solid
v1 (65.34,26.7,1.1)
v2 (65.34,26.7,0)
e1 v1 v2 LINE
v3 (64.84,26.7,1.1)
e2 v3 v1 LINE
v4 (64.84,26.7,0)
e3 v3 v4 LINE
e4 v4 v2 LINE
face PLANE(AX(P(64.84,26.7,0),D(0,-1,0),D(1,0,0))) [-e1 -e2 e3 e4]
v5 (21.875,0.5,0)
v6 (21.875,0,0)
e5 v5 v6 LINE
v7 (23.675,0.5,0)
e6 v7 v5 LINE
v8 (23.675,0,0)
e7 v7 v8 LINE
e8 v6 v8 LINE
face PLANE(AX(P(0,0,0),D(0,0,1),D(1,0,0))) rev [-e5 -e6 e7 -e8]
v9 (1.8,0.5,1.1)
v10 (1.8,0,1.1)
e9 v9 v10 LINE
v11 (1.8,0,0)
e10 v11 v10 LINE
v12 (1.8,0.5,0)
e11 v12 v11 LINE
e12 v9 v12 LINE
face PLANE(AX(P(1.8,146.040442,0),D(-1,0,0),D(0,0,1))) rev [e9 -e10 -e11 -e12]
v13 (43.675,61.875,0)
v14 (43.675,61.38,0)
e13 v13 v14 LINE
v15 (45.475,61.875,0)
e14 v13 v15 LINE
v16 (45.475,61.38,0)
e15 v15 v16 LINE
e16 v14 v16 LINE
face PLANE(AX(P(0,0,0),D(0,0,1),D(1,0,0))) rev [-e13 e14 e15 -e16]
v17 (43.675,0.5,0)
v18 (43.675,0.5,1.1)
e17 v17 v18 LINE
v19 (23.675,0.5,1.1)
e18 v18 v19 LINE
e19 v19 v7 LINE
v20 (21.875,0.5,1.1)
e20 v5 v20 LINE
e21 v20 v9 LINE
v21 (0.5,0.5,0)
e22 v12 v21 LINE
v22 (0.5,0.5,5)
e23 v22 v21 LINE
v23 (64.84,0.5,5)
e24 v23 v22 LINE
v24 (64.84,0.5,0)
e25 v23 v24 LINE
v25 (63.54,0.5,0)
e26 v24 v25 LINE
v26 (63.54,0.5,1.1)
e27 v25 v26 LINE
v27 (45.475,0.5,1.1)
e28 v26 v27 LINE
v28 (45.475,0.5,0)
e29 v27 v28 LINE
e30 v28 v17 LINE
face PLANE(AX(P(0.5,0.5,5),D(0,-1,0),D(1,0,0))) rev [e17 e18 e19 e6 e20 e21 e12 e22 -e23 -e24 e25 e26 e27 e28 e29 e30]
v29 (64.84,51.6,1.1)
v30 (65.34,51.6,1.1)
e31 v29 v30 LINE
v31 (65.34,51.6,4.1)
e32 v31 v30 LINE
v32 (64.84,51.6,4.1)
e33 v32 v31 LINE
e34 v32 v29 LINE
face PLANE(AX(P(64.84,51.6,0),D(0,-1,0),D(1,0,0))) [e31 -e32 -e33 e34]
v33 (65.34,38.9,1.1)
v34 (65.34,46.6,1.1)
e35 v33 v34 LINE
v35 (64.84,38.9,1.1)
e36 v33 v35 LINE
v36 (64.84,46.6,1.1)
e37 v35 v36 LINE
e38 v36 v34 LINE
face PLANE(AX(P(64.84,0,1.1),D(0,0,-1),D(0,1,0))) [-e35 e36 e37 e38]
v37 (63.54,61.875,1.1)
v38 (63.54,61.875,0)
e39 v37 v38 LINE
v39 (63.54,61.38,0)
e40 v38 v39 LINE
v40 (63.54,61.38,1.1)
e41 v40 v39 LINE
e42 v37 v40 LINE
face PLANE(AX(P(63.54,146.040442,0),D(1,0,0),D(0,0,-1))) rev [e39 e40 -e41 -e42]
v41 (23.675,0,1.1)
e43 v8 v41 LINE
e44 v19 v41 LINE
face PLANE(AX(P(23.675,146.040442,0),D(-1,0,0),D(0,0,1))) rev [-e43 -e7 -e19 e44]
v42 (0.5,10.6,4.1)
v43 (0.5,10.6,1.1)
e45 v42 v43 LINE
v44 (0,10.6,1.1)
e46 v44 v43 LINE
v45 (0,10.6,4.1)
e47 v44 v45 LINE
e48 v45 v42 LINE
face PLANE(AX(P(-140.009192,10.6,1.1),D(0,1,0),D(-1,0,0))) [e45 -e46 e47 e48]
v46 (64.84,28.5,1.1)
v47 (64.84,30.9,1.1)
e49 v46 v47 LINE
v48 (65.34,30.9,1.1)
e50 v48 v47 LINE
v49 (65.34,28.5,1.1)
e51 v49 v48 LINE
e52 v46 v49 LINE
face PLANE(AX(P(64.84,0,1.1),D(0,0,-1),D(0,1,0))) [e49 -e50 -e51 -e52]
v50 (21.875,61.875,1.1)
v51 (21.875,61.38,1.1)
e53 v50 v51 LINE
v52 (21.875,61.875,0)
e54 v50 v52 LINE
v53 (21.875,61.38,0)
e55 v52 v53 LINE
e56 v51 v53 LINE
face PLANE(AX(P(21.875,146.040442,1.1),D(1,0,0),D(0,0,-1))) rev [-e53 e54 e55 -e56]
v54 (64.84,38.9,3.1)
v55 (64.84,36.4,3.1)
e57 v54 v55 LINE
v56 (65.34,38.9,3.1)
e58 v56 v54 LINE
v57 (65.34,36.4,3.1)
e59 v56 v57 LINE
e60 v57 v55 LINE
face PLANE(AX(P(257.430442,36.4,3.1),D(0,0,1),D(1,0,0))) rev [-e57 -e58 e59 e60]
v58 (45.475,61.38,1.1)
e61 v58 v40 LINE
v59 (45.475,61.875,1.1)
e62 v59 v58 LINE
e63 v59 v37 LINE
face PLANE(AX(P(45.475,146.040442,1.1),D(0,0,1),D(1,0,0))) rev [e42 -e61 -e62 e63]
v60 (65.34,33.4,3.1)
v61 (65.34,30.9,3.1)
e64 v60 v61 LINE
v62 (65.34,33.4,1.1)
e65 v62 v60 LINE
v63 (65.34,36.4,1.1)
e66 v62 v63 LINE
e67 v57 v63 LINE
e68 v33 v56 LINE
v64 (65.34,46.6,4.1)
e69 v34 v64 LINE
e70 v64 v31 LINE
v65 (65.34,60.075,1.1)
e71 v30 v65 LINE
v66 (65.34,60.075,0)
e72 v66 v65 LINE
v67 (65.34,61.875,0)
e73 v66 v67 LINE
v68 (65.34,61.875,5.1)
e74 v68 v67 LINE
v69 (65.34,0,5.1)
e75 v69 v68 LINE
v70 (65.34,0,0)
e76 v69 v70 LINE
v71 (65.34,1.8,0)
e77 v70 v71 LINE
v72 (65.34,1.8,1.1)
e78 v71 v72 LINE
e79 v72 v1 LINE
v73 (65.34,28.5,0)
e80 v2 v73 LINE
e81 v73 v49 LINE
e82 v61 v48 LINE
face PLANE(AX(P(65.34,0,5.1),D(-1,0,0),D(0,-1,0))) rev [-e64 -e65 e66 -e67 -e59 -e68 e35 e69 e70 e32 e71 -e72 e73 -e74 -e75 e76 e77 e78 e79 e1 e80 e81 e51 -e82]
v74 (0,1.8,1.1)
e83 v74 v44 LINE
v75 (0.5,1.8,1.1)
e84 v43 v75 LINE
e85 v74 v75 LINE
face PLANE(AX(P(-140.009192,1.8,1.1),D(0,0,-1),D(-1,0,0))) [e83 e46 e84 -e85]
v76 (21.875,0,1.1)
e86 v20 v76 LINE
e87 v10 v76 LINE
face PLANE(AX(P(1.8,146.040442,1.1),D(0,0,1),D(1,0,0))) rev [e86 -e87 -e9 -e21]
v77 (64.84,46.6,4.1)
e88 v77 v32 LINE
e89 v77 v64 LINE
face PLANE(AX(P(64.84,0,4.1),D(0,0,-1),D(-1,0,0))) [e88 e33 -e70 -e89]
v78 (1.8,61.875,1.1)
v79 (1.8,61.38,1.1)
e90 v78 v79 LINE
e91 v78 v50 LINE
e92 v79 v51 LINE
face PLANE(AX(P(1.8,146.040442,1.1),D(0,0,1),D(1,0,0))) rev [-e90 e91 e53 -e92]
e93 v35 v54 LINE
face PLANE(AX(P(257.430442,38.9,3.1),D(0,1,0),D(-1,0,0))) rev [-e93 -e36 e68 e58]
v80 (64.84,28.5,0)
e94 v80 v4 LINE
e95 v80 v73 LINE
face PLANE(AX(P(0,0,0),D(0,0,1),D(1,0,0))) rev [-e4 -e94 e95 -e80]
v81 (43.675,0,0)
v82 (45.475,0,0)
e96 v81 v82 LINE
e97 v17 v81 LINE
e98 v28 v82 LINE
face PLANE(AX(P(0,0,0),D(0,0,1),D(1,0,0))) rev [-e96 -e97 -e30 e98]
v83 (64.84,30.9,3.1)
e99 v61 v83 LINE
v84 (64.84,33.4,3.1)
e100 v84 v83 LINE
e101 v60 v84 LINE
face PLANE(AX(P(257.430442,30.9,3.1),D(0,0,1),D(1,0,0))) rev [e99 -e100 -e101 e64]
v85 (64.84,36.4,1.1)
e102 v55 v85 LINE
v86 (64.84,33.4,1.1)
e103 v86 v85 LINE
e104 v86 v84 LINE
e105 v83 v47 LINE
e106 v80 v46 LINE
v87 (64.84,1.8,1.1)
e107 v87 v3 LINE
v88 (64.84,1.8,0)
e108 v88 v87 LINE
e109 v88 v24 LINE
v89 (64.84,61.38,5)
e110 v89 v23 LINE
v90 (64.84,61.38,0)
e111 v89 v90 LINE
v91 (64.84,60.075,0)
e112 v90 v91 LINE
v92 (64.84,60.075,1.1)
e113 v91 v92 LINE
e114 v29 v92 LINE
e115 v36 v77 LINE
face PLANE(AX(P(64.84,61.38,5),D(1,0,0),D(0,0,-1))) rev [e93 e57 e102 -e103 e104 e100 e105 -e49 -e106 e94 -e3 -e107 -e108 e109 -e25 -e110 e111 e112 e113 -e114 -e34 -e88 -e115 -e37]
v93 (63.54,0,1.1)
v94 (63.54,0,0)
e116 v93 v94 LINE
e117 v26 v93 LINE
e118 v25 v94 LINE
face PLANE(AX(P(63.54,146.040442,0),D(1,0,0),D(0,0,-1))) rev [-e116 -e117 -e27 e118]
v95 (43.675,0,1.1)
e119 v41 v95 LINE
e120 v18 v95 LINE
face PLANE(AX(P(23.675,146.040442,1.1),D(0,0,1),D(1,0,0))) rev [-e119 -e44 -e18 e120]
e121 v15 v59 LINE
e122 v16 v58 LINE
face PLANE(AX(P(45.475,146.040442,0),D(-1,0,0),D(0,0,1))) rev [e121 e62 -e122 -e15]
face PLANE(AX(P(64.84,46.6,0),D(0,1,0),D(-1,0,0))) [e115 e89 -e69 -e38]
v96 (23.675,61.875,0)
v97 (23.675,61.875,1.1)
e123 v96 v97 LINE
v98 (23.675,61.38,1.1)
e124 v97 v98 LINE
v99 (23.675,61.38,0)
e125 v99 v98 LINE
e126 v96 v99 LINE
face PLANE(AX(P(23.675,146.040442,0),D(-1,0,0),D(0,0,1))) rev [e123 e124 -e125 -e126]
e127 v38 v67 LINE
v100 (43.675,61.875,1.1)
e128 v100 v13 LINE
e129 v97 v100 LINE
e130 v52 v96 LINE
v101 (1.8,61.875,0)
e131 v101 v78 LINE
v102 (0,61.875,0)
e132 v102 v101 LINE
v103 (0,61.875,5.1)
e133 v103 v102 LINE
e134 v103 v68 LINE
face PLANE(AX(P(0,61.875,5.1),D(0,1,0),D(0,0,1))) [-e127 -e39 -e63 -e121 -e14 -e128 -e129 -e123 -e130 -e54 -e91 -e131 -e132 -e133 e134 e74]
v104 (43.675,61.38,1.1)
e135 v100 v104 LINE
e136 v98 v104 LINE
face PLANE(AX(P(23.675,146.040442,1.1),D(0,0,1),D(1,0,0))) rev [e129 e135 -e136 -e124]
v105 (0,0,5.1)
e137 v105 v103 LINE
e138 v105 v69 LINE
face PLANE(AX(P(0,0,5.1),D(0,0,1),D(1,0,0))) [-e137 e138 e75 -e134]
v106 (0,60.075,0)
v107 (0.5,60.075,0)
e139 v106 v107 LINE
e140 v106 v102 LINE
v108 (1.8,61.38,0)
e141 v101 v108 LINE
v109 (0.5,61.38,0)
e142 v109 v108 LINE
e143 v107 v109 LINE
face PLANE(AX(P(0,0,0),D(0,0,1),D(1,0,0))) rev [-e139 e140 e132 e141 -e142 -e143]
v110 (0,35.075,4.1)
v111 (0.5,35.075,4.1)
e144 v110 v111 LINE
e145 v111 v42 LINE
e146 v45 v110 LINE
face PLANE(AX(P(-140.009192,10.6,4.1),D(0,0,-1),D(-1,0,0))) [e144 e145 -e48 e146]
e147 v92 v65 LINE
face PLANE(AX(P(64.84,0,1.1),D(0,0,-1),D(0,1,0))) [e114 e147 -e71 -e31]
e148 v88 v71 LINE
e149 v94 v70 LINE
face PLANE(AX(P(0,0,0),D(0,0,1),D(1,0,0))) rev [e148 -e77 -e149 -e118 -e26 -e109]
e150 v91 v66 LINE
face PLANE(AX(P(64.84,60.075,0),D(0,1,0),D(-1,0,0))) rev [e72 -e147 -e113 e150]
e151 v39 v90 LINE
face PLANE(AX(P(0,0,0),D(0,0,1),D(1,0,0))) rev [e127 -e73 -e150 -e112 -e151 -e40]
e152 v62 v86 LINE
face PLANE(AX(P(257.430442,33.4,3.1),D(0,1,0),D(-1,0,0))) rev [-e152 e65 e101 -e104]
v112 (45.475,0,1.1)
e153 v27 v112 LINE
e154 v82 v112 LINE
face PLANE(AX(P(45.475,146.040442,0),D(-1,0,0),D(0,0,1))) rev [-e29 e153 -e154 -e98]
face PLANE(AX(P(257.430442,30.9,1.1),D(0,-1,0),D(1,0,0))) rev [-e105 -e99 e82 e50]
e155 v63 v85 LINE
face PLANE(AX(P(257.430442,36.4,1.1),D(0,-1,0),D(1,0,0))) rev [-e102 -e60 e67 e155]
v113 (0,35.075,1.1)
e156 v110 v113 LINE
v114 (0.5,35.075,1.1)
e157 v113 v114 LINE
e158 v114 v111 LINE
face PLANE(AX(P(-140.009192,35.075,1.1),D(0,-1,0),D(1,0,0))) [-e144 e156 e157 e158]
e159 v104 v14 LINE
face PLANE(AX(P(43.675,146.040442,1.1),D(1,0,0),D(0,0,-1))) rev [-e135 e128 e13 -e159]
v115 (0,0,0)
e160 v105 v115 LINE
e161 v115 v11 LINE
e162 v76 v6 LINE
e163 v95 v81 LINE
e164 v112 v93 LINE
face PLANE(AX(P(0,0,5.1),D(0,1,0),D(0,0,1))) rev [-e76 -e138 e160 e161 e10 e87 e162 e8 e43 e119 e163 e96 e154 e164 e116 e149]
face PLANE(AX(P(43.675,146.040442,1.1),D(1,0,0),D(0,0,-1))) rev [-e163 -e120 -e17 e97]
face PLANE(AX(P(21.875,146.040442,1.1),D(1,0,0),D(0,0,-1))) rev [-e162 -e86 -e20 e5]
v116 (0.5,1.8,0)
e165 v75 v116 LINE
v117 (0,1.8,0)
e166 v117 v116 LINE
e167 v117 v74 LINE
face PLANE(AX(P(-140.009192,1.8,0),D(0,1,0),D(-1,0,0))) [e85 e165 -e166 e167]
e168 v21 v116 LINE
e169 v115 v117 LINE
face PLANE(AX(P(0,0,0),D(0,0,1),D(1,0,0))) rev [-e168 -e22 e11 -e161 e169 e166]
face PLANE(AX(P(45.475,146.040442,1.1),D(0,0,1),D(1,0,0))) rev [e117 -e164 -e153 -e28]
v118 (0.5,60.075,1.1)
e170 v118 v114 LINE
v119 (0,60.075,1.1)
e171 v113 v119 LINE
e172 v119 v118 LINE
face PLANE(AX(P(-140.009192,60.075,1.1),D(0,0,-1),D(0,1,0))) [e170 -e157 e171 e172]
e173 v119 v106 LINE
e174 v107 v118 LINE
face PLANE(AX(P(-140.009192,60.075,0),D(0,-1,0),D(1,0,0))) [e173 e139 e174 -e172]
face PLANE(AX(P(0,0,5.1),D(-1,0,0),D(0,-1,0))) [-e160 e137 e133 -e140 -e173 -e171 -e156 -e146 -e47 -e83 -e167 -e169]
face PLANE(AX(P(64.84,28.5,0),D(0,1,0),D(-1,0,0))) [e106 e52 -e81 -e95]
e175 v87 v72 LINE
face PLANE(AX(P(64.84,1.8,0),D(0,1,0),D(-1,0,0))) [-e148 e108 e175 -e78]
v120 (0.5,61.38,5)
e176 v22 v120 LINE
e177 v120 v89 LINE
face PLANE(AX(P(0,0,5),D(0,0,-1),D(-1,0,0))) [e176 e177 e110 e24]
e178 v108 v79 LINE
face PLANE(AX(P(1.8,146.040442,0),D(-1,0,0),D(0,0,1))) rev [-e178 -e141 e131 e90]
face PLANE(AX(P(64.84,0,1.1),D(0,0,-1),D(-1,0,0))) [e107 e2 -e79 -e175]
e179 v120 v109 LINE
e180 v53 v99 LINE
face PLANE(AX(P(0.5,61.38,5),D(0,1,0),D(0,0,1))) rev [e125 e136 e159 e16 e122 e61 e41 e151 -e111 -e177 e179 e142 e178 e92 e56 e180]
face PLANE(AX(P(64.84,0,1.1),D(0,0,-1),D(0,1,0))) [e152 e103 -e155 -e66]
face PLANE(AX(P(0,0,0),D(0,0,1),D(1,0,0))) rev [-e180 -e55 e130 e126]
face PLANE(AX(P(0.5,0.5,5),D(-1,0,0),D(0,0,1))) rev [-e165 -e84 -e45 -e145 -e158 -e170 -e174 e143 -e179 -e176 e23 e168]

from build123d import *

# Parameters (mm, degrees)
SKETCH_1_W               = 65.34
SKETCH_1_H               = 61.875
EXTRUDE_1_DEPTH          = 5.1
CUT_EXTRUDE_1_DEPTH      = 0.5
SKETCH_2_3_W             = 1.1
SKETCH_2_3_H             = 24.9
CUT_EXTRUDE_2_DEPTH      = 0.5
SKETCH_3_OUTSIDE_W       = 85.366
SKETCH_3_OUTSIDE_H       = 81.901
SKETCH_3_OUTSIDE_W_2     = 65.34
SKETCH_3_OUTSIDE_H_2     = 61.875
SKETCH_3_OUTSIDE_W_3     = 64.34
SKETCH_3_OUTSIDE_H_3     = 60.88
CUT_EXTRUDE_4_DEPTH      = 5
CUT_EXTRUDE_6_DEPTH      = 91.13235393
CUT_EXTRUDE_6_DEPTH_BACK = 91.13235393
CUT_EXTRUDE_7_DEPTH      = 91.13235393
CUT_EXTRUDE_7_DEPTH_BACK = 0.6
CUT_EXTRUDE_START        = -0.5
CUT_EXTRUDE_8_OUTLINE_W  = 2
CUT_EXTRUDE_8_OUTLINE_H  = 2.5
CUT_EXTRUDE_8_DEPTH      = 0.5


# Read off the part's stored shape, not the designer's step: 切除-拉伸8
with BuildPart() as part:
    # 草图1 → 凸台-拉伸1 (new body)
    with BuildSketch(Plane.XY):
        with Locations((32.67, 30.9375)):
            Rectangle(SKETCH_1_W, SKETCH_1_H)
    extrude(amount=EXTRUDE_1_DEPTH)

    # 草图2 → 切除-拉伸1 (cut)
    with BuildSketch(Plane(origin=(65.34, 0, 0), x_dir=(0, 0, -1), z_dir=(1, 0, 0))):
        Polygon((0, 28.5), (0, 60.075), (-1.1, 60.075), (-1.1, 51.6), (-4.1, 51.6), (-4.1, 46.6), (-1.1, 46.6), (-1.1, 28.5), align=None)
    extrude(amount=-CUT_EXTRUDE_1_DEPTH, mode=Mode.SUBTRACT)

    # 草图2<3> → 切除-拉伸2 (cut)
    with BuildSketch(Plane(origin=(65.34, 0, 0), x_dir=(0, 0, -1), z_dir=(1, 0, 0))):
        with Locations((-0.55, 14.25)):
            Rectangle(SKETCH_2_3_W, SKETCH_2_3_H)
    extrude(amount=-CUT_EXTRUDE_2_DEPTH, mode=Mode.SUBTRACT)

    # 草图3 outside → 切除-拉伸4 (cut)
    # profile 1 of 2: a face of its own
    with BuildSketch(Plane(origin=(0, 0, 0), x_dir=(-1, 0, 0), z_dir=(0, 0, -1))):
        with Locations((-32.67, 30.9375)):
            Rectangle(SKETCH_3_OUTSIDE_W, SKETCH_3_OUTSIDE_H)
        with Locations((-32.67, 30.9375)):
            Rectangle(SKETCH_3_OUTSIDE_W_2, SKETCH_3_OUTSIDE_H_2, mode=Mode.SUBTRACT)
    # profile 2 of 2: a face of its own
    with BuildSketch(Plane(origin=(0, 0, 0), x_dir=(-1, 0, 0), z_dir=(0, 0, -1))):
        with Locations((-32.67, 30.94)):
            Rectangle(SKETCH_3_OUTSIDE_W_3, SKETCH_3_OUTSIDE_H_3)
    extrude(amount=-CUT_EXTRUDE_4_DEPTH, mode=Mode.SUBTRACT)

    # 草图6 → 切除-拉伸6 (cut, two sides: drawn at the far end of the back side and taken through both)
    with BuildSketch(Plane(origin=(0, 0, 0), x_dir=(1, 0, 0), z_dir=(0, 1, 0)).offset(-CUT_EXTRUDE_6_DEPTH_BACK)):
        Polygon((-141.077467171, 0), (0, 0), (1.8, 0), (1.8, -1.1), (21.875, -1.1), (21.875, 0), (23.675, 0), (23.675, -1.1), (43.675, -1.1), (43.675, 0), (45.475, 0), (45.475, -1.1), (63.54, -1.1), (63.54, 0), (65.34, 0), (206.417467171, 0), (206.417467171, 282.154934342), (-141.077467171, 282.154934342), align=None)
    extrude(amount=CUT_EXTRUDE_6_DEPTH + CUT_EXTRUDE_6_DEPTH_BACK, mode=Mode.SUBTRACT)

    # 草图13 → 切除-拉伸7 (cut, two sides: drawn at the far end of the back side and taken through both)
    with BuildSketch(Plane.ZY.offset(-CUT_EXTRUDE_7_DEPTH_BACK)):
        Polygon((1.1, 60.075), (0, 60.075), (0, 1.8), (1.1, 1.8), (1.1, 10.6), (4.1, 10.6), (4.1, 35.075), (1.1, 35.075), align=None)
    extrude(amount=CUT_EXTRUDE_7_DEPTH + CUT_EXTRUDE_7_DEPTH_BACK, mode=Mode.SUBTRACT)

    # 切除-拉伸8 outline → 切除-拉伸8 (cut)
    with BuildSketch(Plane(origin=(65.34, 0, 0), x_dir=(0, 0, -1), z_dir=(1, 0, 0)).offset(CUT_EXTRUDE_START)):
        with Locations((-2.1, 32.15)):
            Rectangle(CUT_EXTRUDE_8_OUTLINE_W, CUT_EXTRUDE_8_OUTLINE_H)
        with Locations((-2.1, 37.65)):
            Rectangle(CUT_EXTRUDE_8_OUTLINE_W, CUT_EXTRUDE_8_OUTLINE_H)
    extrude(amount=CUT_EXTRUDE_8_DEPTH, mode=Mode.SUBTRACT)


solid = part.part
